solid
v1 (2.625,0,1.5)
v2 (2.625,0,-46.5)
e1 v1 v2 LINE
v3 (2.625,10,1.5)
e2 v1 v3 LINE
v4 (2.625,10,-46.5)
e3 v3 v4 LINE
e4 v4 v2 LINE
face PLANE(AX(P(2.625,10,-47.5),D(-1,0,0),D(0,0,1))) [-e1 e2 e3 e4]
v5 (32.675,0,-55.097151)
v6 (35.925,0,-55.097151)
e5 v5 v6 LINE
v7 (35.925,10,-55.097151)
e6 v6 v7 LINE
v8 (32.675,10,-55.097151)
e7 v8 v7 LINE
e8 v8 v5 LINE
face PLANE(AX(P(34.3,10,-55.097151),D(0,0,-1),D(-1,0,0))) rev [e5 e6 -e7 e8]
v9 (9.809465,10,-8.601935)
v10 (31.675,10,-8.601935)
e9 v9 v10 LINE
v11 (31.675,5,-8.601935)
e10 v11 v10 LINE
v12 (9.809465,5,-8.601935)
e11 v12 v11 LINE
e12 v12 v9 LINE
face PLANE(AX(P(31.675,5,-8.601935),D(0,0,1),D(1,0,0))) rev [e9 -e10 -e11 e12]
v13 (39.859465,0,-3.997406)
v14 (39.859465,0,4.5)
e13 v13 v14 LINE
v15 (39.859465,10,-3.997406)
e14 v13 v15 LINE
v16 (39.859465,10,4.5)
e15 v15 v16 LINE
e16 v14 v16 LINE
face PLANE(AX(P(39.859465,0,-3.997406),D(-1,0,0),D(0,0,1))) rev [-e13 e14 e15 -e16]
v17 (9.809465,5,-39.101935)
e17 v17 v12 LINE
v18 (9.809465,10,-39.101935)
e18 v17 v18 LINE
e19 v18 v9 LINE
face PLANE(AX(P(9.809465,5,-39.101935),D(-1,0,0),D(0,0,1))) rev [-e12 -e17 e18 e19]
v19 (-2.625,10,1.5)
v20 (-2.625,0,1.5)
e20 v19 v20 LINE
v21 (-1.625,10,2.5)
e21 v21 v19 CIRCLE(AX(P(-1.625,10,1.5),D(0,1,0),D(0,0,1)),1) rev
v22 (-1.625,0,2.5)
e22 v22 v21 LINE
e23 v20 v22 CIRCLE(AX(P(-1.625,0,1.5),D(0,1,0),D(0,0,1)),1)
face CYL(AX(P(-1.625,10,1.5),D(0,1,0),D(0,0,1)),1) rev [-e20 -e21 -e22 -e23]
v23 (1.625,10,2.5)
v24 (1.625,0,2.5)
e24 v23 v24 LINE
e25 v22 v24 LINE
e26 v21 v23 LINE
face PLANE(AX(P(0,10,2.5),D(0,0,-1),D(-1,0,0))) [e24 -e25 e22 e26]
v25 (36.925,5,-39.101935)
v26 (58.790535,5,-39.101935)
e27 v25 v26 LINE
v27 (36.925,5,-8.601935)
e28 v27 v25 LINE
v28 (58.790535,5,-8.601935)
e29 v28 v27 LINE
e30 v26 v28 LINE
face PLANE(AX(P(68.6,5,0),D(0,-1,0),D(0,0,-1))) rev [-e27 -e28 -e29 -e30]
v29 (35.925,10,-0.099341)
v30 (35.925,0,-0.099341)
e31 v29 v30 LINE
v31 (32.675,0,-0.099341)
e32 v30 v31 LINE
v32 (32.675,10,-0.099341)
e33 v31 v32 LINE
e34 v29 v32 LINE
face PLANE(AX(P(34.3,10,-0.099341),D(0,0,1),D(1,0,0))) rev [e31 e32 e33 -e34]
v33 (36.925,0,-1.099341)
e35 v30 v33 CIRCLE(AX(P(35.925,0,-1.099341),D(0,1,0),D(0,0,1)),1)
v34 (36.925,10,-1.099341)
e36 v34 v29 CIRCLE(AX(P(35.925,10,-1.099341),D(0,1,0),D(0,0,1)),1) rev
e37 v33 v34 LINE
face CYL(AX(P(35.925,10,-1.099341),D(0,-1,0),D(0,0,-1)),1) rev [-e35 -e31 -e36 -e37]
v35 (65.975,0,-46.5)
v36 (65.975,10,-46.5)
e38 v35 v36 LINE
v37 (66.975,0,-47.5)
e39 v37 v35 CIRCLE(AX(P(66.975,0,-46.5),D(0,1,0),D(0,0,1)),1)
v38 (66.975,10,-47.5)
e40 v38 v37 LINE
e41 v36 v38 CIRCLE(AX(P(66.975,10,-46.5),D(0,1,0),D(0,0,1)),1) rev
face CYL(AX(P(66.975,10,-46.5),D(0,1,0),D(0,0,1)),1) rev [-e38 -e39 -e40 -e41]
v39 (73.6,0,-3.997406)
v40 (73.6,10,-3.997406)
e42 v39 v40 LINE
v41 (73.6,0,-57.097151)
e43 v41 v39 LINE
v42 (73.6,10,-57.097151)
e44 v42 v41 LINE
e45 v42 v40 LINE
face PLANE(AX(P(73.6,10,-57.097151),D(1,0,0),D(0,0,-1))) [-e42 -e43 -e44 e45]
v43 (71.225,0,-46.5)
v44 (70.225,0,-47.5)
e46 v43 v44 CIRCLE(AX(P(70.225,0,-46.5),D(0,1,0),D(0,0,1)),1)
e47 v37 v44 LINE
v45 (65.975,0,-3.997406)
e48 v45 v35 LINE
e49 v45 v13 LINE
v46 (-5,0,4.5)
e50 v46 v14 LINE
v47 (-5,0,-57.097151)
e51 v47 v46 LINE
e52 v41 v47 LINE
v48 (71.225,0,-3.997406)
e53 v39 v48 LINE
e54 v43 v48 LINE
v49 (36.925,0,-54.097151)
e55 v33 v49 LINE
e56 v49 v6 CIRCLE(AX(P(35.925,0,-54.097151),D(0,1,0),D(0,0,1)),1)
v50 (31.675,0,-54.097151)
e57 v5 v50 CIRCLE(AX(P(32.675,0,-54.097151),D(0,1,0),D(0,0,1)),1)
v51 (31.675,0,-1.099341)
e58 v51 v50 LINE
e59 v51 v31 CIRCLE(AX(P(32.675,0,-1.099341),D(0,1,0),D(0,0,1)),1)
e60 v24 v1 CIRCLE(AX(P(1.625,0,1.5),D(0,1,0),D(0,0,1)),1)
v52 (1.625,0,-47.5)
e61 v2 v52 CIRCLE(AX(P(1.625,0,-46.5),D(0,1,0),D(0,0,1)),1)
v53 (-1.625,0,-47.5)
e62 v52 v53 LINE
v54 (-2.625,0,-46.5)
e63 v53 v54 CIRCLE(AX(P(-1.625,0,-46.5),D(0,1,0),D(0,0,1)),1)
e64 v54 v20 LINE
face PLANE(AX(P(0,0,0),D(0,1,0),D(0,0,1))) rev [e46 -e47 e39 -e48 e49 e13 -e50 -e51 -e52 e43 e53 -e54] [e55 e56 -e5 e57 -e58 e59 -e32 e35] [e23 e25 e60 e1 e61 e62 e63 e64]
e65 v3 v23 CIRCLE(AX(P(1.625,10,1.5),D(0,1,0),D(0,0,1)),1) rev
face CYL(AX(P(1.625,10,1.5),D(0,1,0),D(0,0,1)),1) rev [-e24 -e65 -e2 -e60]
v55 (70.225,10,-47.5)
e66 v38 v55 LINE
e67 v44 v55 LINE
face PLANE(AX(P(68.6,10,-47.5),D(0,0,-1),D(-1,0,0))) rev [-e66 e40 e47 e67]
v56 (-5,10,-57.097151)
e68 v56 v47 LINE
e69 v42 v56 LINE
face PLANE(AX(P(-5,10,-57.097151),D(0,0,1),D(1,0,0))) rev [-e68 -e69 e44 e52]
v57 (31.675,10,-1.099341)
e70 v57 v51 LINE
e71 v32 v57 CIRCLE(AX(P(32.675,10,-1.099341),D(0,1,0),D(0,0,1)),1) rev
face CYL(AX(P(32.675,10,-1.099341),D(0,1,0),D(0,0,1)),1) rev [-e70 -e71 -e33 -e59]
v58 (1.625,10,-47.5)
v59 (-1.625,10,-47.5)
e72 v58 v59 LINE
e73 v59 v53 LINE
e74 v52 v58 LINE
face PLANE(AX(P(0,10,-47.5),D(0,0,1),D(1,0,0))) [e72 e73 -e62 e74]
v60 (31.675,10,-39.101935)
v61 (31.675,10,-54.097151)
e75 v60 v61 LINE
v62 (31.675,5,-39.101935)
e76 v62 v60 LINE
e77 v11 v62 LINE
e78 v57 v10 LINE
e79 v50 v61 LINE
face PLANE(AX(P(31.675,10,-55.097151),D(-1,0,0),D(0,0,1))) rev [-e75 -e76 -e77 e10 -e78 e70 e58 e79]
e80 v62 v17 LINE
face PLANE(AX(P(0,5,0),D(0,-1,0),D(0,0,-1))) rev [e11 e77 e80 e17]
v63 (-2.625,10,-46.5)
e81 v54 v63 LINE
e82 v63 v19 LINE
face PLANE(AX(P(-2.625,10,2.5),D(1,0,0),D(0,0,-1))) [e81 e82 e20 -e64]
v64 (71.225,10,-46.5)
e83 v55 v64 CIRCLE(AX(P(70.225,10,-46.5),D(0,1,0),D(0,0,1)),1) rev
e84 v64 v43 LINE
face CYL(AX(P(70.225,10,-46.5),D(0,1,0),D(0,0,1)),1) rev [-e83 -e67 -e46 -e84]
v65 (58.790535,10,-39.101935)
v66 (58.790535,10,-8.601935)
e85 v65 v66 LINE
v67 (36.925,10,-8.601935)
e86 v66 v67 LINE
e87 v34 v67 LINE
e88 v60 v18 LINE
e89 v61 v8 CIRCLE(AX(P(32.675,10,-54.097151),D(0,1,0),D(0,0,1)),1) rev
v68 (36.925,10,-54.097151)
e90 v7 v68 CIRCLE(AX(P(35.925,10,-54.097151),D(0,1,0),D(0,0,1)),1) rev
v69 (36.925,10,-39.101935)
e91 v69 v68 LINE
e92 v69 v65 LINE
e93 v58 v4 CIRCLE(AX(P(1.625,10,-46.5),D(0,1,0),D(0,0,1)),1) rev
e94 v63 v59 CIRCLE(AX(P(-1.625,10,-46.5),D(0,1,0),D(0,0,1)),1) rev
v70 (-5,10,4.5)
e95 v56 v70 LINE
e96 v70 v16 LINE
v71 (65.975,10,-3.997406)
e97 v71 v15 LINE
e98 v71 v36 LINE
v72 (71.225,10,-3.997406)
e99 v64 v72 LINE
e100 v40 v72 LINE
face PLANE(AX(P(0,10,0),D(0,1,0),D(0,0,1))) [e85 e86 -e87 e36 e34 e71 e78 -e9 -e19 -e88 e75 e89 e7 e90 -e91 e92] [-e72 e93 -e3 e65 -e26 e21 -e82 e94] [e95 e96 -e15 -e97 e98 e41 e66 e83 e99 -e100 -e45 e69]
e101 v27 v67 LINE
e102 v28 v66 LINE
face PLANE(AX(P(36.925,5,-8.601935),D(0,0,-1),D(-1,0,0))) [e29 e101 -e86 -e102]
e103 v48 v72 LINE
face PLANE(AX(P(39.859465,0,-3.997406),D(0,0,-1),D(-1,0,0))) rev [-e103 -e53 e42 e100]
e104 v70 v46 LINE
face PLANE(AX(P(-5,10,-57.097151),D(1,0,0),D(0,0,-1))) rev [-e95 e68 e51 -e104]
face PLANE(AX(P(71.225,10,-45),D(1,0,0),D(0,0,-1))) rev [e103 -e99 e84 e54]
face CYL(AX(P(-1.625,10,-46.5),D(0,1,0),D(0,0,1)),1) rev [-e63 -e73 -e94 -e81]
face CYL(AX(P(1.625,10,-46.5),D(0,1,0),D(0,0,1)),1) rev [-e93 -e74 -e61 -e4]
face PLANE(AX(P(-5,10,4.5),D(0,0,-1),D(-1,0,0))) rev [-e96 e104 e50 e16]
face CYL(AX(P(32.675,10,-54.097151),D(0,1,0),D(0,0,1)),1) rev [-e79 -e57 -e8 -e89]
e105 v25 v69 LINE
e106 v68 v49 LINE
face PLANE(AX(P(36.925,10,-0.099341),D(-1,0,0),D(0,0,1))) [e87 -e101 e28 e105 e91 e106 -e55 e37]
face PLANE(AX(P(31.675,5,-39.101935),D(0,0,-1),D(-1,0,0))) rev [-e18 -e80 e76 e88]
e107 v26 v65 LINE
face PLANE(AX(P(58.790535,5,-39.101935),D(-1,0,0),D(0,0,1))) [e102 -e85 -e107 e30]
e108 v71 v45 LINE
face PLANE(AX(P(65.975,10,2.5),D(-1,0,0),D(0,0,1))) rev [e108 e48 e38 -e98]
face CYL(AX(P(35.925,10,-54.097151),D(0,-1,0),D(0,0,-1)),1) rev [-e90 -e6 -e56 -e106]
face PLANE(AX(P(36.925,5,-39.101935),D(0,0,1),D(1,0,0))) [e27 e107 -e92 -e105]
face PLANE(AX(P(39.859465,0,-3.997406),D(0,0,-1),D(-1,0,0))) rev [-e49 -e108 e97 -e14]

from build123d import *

# Parameters (mm, degrees)
BOSS_EXTRUDE1_DEPTH = 10
FILLET1_R           = 1
SKETCH2_W           = 21.86553483
SKETCH2_H           = 30.5
CUT_EXTRUDE1_DEPTH  = 5
MIRROR1_DEPTH       = 10
MIRROR1_2_OUTLINE_W = 21.86553483
MIRROR1_2_OUTLINE_H = 30.5
MIRROR1_2_DEPTH     = 5
SKETCH6_W           = 43.680332617
SKETCH6_H           = 16.249834628
CUT_EXTRUDE2_DEPTH  = 10


# Read off the part's stored shape, not the designer's step: Mirror1
with BuildPart() as part:
    # Sketch1 → Boss-Extrude1 (new body)
    with BuildSketch(Plane(origin=(0, 0, 0), x_dir=(1, 0, 0), z_dir=(0, 1, 0))):
        Polygon((-5, 57.097150921), (34.3, 57.097150921), (34.3, 55.097150921), (31.675, 55.097150921), (31.675, 52.597150921), (31.675, 2.599340873), (31.675, 0.099340873), (34.3, 0.099340873), (34.3, -4.5), (-5, -4.5), align=None)
        Polygon((-2.625, 45), (-2.625, 0), (-2.625, -2.5), (0, -2.5), (2.625, -2.5), (2.625, 0), (2.625, 45), (2.625, 47.5), (0, 47.5), (-2.625, 47.5), align=None, mode=Mode.SUBTRACT)
    extrude(amount=BOSS_EXTRUDE1_DEPTH)

    # Fillet1
    fillet1_edges = [part.edges().sort_by_distance(p)[0] for p in [
        (31.675, 5, -55.097150921),
        (31.675, 5, -0.099340873),
        (-2.625, 5, -47.5),
        (-2.625, 5, 2.5),
        (2.625, 5, 2.5),
        (2.625, 5, -47.5),
    ]]
    fillet(fillet1_edges, radius=FILLET1_R)

    # Sketch2 → Cut-Extrude1 (cut)
    with BuildSketch(Plane(origin=(0, 10, 0), x_dir=(1, 0, 0), z_dir=(0, 1, 0))):
        with Locations((20.742232585, 23.8519351)):
            Rectangle(SKETCH2_W, SKETCH2_H)
    extrude(amount=-CUT_EXTRUDE1_DEPTH, mode=Mode.SUBTRACT)

    # Mirror1 outline → Mirror1 (add)
    with BuildSketch(Plane(origin=(0, 0, 0), x_dir=(1, 0, 0), z_dir=(0, 1, 0))):
        with BuildLine():
            ThreePointArc((35.925, 55.097150921), (36.632106781, 54.804257702), (36.925, 54.097150921))
            Line((36.925, 54.097150921), (36.925, 39.1019351))
            Line((36.925, 39.1019351), (58.79053483, 39.1019351))
            Line((58.79053483, 39.1019351), (58.79053483, 8.6019351))
            Line((58.79053483, 8.6019351), (36.925, 8.6019351))
            Line((36.925, 8.6019351), (36.925, 1.099340873))
            ThreePointArc((36.925, 1.099340873), (36.632106781, 0.392234092), (35.925, 0.099340873))
            Line((35.925, 0.099340873), (34.3, 0.099340873))
            Line((34.3, 0.099340873), (34.3, -4.5))
            Line((34.3, -4.5), (73.6, -4.5))
            Line((73.6, -4.5), (73.6, 57.097150921))
            Line((73.6, 57.097150921), (34.3, 57.097150921))
            Line((34.3, 57.097150921), (34.3, 55.097150921))
            Line((34.3, 55.097150921), (35.925, 55.097150921))
        make_face()
        with BuildLine():
            Line((70.225, -2.5), (66.975, -2.5))
            ThreePointArc((66.975, -2.5), (66.267893219, -2.207106781), (65.975, -1.5))
            Line((65.975, -1.5), (65.975, 46.5))
            ThreePointArc((65.975, 46.5), (66.267893219, 47.207106781), (66.975, 47.5))
            Line((66.975, 47.5), (70.225, 47.5))
            ThreePointArc((70.225, 47.5), (70.932106781, 47.207106781), (71.225, 46.5))
            Line((71.225, 46.5), (71.225, -1.5))
            ThreePointArc((71.225, -1.5), (70.932106781, -2.207106781), (70.225, -2.5))
        make_face(mode=Mode.SUBTRACT)
    extrude(amount=MIRROR1_DEPTH)

    # Mirror1 2 outline → Mirror1 2 (add)
    with BuildSketch(Plane(origin=(0, 0, 0), x_dir=(1, 0, 0), z_dir=(0, 1, 0))):
        with Locations((47.857767415, 23.8519351)):
            Rectangle(MIRROR1_2_OUTLINE_W, MIRROR1_2_OUTLINE_H)
    extrude(amount=MIRROR1_2_DEPTH)

    # Sketch6 → Cut-Extrude2 (cut)
    with BuildSketch(Plane(origin=(0, 10, 0), x_dir=(1, 0, 0), z_dir=(0, 1, 0))):
        with Locations((61.699631479, -4.127511542)):
            Rectangle(SKETCH6_W, SKETCH6_H)
    extrude(amount=-CUT_EXTRUDE2_DEPTH, mode=Mode.SUBTRACT)


solid = part.part
